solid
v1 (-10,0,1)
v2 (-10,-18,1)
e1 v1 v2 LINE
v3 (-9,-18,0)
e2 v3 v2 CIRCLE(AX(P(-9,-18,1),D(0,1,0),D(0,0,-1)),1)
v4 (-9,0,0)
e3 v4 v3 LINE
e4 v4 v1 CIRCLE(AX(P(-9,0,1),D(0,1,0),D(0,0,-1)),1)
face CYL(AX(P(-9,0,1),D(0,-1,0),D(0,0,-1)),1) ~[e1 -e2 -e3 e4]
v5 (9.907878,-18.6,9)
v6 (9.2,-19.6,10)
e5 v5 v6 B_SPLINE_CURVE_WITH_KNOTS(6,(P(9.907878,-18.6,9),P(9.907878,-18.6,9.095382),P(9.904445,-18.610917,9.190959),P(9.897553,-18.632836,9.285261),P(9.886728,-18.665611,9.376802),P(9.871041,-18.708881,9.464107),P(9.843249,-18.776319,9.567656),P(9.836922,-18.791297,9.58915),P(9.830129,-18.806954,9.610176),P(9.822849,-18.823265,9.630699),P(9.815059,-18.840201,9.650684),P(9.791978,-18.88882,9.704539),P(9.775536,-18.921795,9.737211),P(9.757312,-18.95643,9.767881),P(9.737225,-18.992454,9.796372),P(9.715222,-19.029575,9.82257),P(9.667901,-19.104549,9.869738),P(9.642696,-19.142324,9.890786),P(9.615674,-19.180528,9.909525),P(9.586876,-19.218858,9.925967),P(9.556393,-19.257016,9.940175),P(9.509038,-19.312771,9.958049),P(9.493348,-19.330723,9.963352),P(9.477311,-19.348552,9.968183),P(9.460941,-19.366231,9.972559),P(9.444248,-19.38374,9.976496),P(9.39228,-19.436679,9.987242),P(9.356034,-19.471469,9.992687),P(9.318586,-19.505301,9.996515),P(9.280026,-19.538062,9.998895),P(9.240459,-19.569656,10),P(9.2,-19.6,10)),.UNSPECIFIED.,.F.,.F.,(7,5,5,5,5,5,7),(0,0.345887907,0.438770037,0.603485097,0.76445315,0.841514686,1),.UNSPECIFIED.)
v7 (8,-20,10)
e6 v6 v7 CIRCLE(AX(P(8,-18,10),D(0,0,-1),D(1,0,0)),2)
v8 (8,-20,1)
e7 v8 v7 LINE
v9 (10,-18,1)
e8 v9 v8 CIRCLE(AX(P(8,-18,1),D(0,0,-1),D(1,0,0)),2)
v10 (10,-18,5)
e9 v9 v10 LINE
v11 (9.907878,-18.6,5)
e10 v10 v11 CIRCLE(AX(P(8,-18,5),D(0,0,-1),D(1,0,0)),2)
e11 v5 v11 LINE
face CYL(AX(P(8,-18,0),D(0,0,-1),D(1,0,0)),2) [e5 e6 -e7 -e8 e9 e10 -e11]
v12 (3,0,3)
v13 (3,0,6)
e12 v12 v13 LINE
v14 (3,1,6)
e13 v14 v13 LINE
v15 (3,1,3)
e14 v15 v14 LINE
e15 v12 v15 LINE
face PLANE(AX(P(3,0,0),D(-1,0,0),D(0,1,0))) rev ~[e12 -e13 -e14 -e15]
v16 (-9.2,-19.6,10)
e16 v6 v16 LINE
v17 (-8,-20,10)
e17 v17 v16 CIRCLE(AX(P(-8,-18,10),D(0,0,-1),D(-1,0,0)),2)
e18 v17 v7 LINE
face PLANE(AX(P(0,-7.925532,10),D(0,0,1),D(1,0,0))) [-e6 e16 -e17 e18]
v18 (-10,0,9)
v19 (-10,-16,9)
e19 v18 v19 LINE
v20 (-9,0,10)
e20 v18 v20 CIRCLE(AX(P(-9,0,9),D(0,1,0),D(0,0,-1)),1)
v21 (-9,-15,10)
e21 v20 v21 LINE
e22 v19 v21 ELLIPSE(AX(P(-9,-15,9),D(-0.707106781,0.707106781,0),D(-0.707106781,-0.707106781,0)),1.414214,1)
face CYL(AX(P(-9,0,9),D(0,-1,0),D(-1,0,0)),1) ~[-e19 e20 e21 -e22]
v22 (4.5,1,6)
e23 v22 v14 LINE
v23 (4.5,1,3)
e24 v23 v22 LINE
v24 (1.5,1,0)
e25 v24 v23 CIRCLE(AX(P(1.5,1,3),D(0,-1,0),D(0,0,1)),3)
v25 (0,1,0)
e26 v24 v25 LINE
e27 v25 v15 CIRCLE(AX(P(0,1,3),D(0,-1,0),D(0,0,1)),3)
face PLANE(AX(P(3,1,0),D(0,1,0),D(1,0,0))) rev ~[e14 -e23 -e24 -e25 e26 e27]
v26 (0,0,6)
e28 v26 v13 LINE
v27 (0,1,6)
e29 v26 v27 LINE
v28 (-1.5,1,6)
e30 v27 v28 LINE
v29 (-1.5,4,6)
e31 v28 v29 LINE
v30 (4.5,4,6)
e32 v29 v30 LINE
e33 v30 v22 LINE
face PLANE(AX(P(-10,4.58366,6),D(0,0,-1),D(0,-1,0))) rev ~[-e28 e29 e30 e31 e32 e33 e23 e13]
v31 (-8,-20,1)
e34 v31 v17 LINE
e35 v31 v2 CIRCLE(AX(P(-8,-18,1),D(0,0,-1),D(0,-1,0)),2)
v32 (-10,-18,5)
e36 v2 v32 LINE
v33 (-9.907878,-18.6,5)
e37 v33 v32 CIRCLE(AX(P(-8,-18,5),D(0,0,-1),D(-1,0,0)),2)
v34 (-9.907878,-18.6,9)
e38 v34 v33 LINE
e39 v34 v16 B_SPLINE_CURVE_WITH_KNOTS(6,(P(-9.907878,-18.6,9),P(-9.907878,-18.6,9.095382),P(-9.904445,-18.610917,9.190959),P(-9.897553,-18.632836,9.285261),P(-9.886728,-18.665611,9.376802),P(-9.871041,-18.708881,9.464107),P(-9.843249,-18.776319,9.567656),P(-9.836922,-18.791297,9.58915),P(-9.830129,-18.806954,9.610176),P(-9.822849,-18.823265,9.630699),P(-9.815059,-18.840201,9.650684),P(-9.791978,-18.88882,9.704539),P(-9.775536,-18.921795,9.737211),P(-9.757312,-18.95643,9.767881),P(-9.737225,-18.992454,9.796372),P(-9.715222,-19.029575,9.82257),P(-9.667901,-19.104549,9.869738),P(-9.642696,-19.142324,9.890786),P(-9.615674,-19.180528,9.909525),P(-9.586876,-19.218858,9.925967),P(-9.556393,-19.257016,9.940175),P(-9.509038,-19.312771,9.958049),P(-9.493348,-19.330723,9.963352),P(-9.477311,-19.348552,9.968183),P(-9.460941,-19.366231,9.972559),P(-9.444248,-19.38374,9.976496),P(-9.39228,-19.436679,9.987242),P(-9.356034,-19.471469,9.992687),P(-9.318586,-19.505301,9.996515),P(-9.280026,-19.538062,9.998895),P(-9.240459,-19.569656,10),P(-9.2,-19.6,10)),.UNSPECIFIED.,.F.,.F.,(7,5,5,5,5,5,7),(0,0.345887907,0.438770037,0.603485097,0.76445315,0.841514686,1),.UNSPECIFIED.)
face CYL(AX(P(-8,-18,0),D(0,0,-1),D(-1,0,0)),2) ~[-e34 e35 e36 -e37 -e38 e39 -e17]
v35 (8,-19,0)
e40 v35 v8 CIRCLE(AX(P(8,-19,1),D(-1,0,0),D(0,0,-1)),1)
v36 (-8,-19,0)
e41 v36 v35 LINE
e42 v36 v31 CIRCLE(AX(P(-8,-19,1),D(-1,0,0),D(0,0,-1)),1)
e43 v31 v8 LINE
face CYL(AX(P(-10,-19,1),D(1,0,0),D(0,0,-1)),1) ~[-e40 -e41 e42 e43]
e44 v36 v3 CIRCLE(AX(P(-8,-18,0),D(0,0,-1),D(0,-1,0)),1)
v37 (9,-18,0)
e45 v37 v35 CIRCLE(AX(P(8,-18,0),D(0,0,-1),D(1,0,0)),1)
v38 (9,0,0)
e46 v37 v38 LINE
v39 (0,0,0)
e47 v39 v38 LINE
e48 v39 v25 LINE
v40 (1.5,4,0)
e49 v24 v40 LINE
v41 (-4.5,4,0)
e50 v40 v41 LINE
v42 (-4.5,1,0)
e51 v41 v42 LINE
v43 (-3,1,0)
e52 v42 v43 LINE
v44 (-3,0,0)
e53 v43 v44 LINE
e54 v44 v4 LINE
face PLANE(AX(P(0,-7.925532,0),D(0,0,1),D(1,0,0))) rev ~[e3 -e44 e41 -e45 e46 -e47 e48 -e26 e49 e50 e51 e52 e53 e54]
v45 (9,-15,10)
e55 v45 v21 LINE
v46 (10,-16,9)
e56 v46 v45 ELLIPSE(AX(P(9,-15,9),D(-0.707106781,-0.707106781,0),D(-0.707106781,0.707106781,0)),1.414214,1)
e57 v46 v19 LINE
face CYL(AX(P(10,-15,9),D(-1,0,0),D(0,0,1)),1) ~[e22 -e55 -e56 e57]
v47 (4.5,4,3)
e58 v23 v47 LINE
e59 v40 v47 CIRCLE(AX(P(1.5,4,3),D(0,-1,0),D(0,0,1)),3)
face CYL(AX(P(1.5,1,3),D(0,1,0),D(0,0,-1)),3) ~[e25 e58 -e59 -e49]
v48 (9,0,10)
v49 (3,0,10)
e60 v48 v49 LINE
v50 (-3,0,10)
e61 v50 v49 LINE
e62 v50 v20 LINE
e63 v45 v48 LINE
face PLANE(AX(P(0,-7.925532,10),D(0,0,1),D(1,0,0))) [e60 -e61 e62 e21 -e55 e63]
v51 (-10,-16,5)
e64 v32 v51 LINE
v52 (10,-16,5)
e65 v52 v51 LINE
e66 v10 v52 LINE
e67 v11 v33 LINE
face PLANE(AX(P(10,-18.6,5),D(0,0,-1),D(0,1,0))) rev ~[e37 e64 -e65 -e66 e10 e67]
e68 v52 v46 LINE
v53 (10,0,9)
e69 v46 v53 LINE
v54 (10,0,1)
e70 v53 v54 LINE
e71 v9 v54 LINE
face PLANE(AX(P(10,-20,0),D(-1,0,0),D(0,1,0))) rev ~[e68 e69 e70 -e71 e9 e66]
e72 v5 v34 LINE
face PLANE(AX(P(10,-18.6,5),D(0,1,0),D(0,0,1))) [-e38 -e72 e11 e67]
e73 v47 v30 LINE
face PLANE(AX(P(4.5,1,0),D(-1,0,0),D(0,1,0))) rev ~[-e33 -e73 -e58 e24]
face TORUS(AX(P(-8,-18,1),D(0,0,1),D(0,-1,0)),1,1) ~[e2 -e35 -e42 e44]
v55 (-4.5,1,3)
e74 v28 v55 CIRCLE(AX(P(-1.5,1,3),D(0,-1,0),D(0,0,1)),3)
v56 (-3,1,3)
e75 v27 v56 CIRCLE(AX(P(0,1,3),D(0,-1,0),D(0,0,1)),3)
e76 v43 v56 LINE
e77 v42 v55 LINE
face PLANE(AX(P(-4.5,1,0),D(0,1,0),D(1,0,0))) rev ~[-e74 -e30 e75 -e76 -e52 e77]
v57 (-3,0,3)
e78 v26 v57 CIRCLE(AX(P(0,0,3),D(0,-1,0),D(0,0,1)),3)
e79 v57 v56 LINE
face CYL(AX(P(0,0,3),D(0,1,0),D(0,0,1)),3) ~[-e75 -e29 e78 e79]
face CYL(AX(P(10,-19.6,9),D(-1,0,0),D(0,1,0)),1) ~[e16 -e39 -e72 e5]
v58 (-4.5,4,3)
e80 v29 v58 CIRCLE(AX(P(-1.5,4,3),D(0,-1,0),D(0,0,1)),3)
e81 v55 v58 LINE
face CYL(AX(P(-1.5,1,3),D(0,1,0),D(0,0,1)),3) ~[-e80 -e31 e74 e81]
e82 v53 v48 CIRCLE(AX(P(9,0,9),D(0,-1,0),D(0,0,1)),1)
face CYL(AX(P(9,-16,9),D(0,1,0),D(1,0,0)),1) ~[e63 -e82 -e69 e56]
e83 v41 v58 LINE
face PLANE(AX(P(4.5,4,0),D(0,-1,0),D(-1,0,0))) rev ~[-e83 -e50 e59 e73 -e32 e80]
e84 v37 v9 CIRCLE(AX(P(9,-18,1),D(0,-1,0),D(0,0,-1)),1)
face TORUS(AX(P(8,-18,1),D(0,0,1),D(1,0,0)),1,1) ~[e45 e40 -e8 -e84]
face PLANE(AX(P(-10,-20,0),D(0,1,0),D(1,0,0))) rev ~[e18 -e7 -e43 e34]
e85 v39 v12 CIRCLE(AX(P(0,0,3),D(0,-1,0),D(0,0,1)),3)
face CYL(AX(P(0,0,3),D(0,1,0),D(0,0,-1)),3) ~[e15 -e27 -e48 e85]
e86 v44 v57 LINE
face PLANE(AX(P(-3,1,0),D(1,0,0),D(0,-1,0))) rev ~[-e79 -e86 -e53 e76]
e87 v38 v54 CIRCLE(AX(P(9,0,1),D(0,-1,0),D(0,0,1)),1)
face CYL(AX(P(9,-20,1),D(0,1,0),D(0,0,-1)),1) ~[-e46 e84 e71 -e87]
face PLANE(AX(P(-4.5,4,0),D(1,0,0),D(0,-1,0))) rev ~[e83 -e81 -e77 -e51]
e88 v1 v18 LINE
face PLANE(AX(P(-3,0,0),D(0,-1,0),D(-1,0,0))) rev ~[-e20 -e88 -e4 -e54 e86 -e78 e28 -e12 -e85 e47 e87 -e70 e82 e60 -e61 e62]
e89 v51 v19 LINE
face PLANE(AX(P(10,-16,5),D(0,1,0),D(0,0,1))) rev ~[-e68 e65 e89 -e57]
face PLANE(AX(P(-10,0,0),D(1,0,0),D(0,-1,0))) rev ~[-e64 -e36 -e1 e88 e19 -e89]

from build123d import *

# Parameters (mm, degrees)
F1_DEPTH    = 10
F2_W        = 4.5836600475
F2_H        = 4
F3_DEPTH    = 25
F4_W        = 2.6
F4_H        = 5
F5_DEPTH    = 25
F6_R        = 3
F7_R        = 3
F8_R        = 1
F9_T1_DEPTH = 15
F9_T4_ANGLE = 90
F9_T6_ANGLE = 90


# Not quite as in the source:
# - a fillet or chamfer that OpenCascade refuses, or shapes differently, is made with other operations: its cross-section is extruded or revolved along the edge and cut away or added


with BuildPart() as f1:
    # F0 (on Top) → F1 (new body)
    with BuildSketch(Plane.XY):
        Polygon((4.5, 4), (0, 4), (-4.5, 4), (-4.5, 1), (-3, 1), (-3, 0), (-4.5, 0), (-10, 0), (-10, -20), (0, -20), (10, -20), (10, 0), (4.5, 0), (3, 0), (3, 1), (4.5, 1), align=None)
    extrude(amount=F1_DEPTH)

    # F2 (on face) → F3 (cut)
    with BuildSketch(Plane(origin=(-10, 0, 0), x_dir=(0, -1, 0), z_dir=(-1, 0, 0))):
        with Locations((-2.2918300238, 8)):
            Rectangle(F2_W, F2_H)
    extrude(amount=-F3_DEPTH, mode=Mode.SUBTRACT)

    # F4 (on face) → F5 (cut)
    with BuildSketch(Plane.YZ.offset(10)):
        with Locations((-17.3, 7.5)):
            Rectangle(F4_W, F4_H)
    extrude(amount=-F5_DEPTH, mode=Mode.SUBTRACT)

    # F6
    f6_edges = [f1.edges().sort_by_distance(p)[0] for p in [
        (3, 0.5, 0),
        (-3, 0.5, 6),
    ]]
    fillet(f6_edges, radius=F6_R)

    # F7
    f7_edges = [f1.edges().sort_by_distance(p)[0] for p in [
        (4.5, 2.5, 0),
        (-4.5, 2.5, 6),
    ]]
    fillet(f7_edges, radius=F7_R)

    # F8
    f8_edges = [f1.edges().sort_by_distance(p)[0] for p in [
        (-10, -8, 10),
        (10, -8, 10),
        (-10, -10, 0),
        (0, -20, 0),
        (10, -10, 0),
        (0, -18.6, 10),
        (0, -16, 10),
    ]]
    fillet(f8_edges, radius=F8_R)

    # F9: fillet of radius 2 on 2 edges, made by hand

    # F9_s2 → F9_t1 (cut)
    with BuildSketch(Plane.XY):
        with BuildLine():
            ThreePointArc((10, -18), (9.4142135624, -19.4142135624), (8, -20))
            Line((8, -20), (10, -20))
            Line((10, -20), (10, -18))
        make_face()
        with BuildLine():
            ThreePointArc((-10, -18), (-9.4142135624, -19.4142135624), (-8, -20))
            Line((-8, -20), (-10, -20))
            Line((-10, -20), (-10, -18))
        make_face()
    extrude(amount=F9_T1_DEPTH, mode=Mode.SUBTRACT)

    # F9_s3 → F9_t4 (revolve, cut)
    with BuildSketch(Plane.YZ.offset(-8)):
        with BuildLine():
            ThreePointArc((-19, 0), (-19.7071067812, 0.2928932188), (-20, 1))
            Line((-20, 1), (-20, 0))
            Line((-20, 0), (-19, 0))
        make_face()
    revolve(axis=Axis((-8, -18, 0), (0, 0, -1)), revolution_arc=F9_T4_ANGLE, mode=Mode.SUBTRACT)

    # F9_s5 → F9_t6 (revolve, cut)
    with BuildSketch(Plane.XZ.offset(18)):
        with BuildLine():
            ThreePointArc((9, 0), (9.7071067812, 0.2928932188), (10, 1))
            Line((10, 1), (10, 0))
            Line((10, 0), (9, 0))
        make_face()
    revolve(axis=Axis((8, -18, 0), (0, 0, -1)), revolution_arc=F9_T6_ANGLE, mode=Mode.SUBTRACT)


solid = f1.part
